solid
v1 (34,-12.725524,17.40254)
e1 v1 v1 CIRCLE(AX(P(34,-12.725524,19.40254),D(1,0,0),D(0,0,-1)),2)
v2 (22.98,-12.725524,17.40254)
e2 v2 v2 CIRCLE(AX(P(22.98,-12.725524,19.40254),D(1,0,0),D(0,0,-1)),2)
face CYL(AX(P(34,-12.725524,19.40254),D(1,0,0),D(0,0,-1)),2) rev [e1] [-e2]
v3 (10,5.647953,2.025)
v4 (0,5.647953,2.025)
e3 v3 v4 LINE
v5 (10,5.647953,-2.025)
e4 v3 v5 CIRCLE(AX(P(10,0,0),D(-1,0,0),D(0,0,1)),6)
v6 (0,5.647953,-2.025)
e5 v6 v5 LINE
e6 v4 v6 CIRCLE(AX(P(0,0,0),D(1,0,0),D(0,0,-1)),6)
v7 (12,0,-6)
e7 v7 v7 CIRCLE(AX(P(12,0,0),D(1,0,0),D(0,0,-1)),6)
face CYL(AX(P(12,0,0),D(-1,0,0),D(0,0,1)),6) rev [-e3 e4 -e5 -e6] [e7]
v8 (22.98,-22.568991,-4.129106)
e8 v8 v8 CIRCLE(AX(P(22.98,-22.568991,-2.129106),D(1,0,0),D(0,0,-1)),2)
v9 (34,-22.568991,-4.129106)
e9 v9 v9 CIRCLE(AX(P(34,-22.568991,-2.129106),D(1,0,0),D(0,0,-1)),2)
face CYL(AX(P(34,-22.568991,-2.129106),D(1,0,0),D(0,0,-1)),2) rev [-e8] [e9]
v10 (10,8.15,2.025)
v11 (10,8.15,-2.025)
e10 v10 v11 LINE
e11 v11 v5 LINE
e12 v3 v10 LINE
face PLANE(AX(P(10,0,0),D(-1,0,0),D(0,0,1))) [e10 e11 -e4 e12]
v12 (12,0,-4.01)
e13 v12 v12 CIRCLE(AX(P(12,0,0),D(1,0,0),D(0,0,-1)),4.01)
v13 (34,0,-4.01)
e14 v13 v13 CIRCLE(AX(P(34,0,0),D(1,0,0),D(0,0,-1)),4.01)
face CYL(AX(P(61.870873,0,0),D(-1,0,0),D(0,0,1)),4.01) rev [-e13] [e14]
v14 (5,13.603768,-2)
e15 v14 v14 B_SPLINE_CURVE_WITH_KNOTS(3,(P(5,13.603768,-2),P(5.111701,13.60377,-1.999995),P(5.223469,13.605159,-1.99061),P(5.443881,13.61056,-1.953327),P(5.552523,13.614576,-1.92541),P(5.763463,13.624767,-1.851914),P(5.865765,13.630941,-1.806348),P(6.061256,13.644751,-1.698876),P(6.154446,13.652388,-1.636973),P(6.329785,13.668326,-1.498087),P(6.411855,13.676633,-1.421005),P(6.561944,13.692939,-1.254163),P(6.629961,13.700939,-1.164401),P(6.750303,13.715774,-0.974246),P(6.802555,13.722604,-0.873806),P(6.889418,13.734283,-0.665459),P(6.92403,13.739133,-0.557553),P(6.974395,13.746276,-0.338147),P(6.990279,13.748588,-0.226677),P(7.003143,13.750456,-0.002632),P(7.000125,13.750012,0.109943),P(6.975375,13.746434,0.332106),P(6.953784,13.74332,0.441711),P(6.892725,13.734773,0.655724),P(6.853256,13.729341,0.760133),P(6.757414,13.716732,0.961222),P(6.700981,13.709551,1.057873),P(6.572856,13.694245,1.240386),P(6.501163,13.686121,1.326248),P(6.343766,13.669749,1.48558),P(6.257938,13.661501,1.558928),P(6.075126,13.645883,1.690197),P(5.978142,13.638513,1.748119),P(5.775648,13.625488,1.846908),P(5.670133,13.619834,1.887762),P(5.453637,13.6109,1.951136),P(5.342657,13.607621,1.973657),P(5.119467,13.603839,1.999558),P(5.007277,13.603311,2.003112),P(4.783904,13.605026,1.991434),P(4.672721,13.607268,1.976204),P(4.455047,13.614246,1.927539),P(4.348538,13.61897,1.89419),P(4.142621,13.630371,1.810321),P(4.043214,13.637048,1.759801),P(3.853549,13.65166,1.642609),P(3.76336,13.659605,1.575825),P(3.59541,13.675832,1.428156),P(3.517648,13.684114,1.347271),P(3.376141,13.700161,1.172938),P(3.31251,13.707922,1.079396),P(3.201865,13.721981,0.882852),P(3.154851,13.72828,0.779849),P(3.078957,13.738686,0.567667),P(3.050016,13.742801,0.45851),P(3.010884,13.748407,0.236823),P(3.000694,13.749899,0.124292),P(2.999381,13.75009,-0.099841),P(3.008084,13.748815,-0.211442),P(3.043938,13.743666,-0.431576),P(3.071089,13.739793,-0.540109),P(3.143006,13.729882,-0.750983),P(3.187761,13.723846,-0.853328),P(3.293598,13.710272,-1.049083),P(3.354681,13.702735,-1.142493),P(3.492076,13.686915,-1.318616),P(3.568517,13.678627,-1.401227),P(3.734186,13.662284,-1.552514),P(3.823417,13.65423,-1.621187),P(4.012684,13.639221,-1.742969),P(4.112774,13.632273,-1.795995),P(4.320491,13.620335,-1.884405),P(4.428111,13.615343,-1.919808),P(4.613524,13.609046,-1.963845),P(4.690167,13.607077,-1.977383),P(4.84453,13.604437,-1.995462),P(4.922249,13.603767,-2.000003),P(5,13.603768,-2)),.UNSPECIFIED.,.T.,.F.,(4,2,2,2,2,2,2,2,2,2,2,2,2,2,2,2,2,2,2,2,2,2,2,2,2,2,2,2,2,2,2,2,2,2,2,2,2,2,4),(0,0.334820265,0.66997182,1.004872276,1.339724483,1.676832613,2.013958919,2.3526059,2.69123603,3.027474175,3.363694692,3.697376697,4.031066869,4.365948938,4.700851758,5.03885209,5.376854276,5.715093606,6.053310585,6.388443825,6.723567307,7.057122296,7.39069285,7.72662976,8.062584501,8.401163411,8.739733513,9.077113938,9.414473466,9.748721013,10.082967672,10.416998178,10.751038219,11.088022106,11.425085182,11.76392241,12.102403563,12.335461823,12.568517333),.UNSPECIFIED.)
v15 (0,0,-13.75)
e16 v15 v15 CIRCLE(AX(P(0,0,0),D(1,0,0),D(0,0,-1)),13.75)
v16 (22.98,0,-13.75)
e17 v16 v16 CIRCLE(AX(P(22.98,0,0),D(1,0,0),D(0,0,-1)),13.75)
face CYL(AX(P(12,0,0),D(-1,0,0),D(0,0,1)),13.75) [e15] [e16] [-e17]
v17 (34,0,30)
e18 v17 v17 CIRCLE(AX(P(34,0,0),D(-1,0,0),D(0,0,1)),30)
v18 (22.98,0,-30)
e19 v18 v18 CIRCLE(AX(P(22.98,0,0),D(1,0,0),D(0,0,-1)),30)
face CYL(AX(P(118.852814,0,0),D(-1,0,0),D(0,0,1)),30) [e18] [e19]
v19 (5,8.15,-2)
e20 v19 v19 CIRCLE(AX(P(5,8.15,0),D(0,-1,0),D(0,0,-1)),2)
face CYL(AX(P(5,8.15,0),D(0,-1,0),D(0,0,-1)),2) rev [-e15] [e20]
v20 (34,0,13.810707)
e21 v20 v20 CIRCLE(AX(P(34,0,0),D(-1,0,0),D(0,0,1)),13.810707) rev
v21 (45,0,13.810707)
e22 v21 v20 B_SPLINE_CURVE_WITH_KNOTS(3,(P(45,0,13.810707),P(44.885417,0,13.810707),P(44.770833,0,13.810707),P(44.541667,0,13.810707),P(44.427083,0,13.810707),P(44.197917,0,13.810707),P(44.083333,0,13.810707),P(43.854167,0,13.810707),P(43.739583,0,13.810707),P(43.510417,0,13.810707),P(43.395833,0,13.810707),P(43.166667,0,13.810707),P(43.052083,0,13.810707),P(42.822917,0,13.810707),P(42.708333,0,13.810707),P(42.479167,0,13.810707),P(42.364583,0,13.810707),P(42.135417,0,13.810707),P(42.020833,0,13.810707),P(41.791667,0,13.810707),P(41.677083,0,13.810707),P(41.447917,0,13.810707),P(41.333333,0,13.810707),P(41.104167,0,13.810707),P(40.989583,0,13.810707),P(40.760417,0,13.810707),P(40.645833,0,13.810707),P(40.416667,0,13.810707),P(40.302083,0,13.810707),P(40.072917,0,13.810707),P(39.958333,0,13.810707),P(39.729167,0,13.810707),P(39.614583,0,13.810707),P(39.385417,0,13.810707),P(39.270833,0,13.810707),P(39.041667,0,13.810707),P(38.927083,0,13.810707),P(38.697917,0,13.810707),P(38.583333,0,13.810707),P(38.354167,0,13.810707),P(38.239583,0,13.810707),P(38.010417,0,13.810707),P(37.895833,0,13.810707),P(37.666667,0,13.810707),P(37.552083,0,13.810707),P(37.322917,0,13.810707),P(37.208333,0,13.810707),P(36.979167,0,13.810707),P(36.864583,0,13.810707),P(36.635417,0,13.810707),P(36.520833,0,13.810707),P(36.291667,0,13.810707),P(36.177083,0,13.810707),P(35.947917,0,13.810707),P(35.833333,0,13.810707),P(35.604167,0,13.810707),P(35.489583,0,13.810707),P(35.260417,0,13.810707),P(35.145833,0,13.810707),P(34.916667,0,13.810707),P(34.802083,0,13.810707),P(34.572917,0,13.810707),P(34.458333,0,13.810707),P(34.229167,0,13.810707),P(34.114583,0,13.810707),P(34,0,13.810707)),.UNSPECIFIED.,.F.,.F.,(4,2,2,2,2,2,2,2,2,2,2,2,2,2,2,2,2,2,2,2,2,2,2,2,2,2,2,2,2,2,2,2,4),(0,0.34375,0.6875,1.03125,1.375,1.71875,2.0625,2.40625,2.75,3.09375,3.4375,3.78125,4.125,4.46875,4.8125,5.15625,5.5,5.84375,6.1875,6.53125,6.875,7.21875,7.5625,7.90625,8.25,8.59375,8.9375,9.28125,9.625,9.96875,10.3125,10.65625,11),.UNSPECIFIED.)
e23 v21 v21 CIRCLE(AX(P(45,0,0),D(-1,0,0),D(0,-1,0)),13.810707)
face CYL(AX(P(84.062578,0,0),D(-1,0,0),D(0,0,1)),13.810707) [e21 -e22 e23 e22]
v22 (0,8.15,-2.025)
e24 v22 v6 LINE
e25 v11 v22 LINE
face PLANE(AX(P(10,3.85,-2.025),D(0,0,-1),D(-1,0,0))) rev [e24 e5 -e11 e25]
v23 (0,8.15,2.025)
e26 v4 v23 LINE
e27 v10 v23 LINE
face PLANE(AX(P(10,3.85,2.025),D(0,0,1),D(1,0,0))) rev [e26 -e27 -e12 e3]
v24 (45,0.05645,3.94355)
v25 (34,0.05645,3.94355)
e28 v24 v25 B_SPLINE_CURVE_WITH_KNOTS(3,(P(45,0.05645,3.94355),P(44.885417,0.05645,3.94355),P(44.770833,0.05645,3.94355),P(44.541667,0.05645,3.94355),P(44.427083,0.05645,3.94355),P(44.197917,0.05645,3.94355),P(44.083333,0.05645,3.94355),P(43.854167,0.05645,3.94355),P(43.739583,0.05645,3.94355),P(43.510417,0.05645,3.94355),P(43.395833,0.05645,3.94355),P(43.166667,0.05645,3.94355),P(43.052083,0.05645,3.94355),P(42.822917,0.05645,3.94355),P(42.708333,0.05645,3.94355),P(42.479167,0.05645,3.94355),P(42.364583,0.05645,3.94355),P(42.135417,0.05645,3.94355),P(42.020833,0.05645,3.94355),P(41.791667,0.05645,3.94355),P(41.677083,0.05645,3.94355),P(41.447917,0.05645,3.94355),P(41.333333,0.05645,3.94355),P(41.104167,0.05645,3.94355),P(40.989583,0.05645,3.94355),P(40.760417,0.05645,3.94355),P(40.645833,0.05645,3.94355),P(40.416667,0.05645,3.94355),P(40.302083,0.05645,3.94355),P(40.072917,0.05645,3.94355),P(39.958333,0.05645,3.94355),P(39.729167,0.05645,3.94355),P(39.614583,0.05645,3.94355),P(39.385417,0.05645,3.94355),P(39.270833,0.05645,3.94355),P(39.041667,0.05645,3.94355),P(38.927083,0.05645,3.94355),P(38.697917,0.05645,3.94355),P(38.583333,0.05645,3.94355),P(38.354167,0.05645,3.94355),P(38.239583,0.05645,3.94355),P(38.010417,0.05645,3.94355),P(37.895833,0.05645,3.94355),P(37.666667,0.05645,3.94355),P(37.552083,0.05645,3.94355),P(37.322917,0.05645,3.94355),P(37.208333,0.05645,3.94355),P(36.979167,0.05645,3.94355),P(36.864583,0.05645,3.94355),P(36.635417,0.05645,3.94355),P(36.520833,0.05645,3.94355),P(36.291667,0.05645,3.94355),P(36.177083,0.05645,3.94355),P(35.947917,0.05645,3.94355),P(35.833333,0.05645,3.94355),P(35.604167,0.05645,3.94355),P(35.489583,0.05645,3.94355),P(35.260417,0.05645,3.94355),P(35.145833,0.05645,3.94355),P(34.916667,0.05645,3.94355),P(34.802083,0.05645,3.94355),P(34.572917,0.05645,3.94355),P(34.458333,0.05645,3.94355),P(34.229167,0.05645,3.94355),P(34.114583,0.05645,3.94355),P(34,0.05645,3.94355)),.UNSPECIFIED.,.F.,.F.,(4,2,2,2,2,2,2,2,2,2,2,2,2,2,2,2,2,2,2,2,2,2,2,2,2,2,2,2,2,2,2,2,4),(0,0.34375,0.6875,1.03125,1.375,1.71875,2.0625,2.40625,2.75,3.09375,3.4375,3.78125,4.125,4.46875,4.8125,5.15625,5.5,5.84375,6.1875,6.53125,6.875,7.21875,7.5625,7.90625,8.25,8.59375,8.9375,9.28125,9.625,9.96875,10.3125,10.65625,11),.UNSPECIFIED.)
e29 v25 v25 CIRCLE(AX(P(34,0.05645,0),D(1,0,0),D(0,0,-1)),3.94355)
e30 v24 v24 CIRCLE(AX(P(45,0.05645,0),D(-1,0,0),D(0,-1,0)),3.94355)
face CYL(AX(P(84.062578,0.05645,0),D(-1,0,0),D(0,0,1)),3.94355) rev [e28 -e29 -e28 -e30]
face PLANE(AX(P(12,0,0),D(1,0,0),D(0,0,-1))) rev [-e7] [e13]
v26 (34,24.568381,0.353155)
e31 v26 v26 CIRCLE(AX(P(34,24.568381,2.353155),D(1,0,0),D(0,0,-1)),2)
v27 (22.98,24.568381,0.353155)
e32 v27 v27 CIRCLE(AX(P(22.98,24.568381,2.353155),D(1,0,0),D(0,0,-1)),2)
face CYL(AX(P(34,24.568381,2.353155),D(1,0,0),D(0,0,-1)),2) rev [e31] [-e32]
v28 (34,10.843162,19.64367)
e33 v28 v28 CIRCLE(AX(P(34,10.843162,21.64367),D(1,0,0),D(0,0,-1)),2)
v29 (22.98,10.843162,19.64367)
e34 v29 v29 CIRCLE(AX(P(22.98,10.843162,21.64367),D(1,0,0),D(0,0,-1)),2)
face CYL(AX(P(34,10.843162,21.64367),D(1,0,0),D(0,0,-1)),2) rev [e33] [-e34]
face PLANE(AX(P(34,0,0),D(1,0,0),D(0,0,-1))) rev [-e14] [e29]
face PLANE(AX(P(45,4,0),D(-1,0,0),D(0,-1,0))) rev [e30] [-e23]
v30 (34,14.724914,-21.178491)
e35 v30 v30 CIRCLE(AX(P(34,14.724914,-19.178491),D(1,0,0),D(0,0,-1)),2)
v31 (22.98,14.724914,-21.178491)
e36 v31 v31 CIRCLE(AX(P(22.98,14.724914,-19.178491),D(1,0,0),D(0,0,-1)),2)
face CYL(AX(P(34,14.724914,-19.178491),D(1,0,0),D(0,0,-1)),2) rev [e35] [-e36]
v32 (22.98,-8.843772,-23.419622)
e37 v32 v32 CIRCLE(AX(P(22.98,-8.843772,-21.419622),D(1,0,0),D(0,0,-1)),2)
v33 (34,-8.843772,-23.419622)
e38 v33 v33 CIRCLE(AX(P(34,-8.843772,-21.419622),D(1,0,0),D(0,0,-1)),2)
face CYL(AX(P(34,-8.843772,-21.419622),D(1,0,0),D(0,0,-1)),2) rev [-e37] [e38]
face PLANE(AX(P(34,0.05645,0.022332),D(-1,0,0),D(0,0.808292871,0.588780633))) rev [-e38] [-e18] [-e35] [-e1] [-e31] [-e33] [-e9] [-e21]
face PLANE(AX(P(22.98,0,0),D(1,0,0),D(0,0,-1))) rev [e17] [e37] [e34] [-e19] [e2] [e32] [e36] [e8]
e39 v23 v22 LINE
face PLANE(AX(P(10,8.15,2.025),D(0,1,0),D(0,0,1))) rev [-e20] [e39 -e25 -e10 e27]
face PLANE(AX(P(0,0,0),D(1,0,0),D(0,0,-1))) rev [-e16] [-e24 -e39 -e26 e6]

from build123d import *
from build123d.topology import SkipClean

# Parameters (mm, degrees)
SKETCH1_R                 = 13.75
SKETCH1_R_2               = 6
BOSS_EXTRUDE1_DEPTH       = 12
SKETCH2_R                 = 13.75
SKETCH2_R_2               = 4.01
BOSS_EXTRUDE3_DEPTH       = 10.98
SKETCH3_R                 = 30
BOSS_EXTRUDE4_DEPTH       = 11.02
F_4_0MM_DOWEL_HOLE1_D     = 4
F_4_0MM_DOWEL_HOLE1_DEPTH = 25.4
F_4_0MM_DOWEL_HOLE1_TIP   = 1.201721238
SKETCH11_W                = 4.05
SKETCH11_H                = 4.3
CUT_EXTRUDE1_DEPTH        = 10
CUT_EXTRUDE2_START        = -32
SKETCH15_R                = 4.01
CUT_EXTRUDE2_DEPTH        = 32
SKETCH16_R                = 13.810706785
SKETCH16_R_2              = 3.943549935
BOSS_EXTRUDE5_DEPTH       = 11


with BuildPart() as part:
    # Sketch1 → Boss-Extrude1 (new body)
    with BuildSketch(Plane(origin=(0, 0, 0), x_dir=(0, 0, -1), z_dir=(1, 0, 0))):
        Circle(SKETCH1_R)
        Circle(SKETCH1_R_2, mode=Mode.SUBTRACT)
    extrude(amount=BOSS_EXTRUDE1_DEPTH)

    # Sketch2 → Boss-Extrude3 (add)
    with BuildSketch(Plane(origin=(12, 0, 0), x_dir=(0, 0, -1), z_dir=(1, 0, 0))):
        with Locations(Location((0, 0, 0), (0, 0, 180))):
            Circle(SKETCH2_R)
        with Locations(Location((0, 0, 0), (0, 0, 180))):
            Circle(SKETCH2_R_2, mode=Mode.SUBTRACT)
    extrude(amount=BOSS_EXTRUDE3_DEPTH)

    # Sketch3 → Boss-Extrude4 (add)
    with BuildSketch(Plane(origin=(22.98, 0, 0), x_dir=(0, 0, -1), z_dir=(1, 0, 0))):
        with Locations(Location((0, 0, 0), (0, 0, 180))):
            Circle(SKETCH3_R)
    extrude(amount=BOSS_EXTRUDE4_DEPTH)

    # Ø4.0mm Dowel Hole1
    with Locations(Plane(origin=(34, 0, 0), x_dir=(0, 0, -1), z_dir=(1, 0, 0))):
        with Locations((-21.643670313, 10.843162234), (-2.353154811, 24.568381237), (19.178491269, 14.724914261), (21.419621846, -8.843771717), (-19.402539736, -12.725523744), (2.129106344, -22.56899072)):
            Hole(F_4_0MM_DOWEL_HOLE1_D / 2, depth=F_4_0MM_DOWEL_HOLE1_DEPTH)
            with Locations((0, 0, -(F_4_0MM_DOWEL_HOLE1_DEPTH + F_4_0MM_DOWEL_HOLE1_TIP / 2))):  # 118° drill point
                Cone(0, F_4_0MM_DOWEL_HOLE1_D / 2, F_4_0MM_DOWEL_HOLE1_TIP, mode=Mode.SUBTRACT)

    # Sketch11 → Cut-Extrude1 (cut)
    with BuildSketch(Plane.ZY):
        with Locations((0, 6)):
            Rectangle(SKETCH11_W, SKETCH11_H)
    extrude(amount=-CUT_EXTRUDE1_DEPTH, mode=Mode.SUBTRACT)

    # Sketch14 → Ø4.0mm Dowel Hole2 (revolve, cut)
    with BuildSketch(Plane(origin=(5, 8.15, 0), x_dir=(0, 0, -1), z_dir=(1, 0, 0))):
        Polygon((0, 0), (0, 26.601721238), (2, 25.4), (2, 0), align=None)
    revolve(axis=Axis((5, 1.8, 0), (0, 1, 0)), mode=Mode.SUBTRACT)

    # Sketch15 → Cut-Extrude2 (cut)
    with SkipClean():  # the faces are left unmerged after this step: merging them gives an invalid solid
        with BuildSketch(Plane(origin=(34, 0, 0), x_dir=(0, 0, -1), z_dir=(1, 0, 0)).offset(CUT_EXTRUDE2_START)):
            Circle(SKETCH15_R)
        extrude(amount=CUT_EXTRUDE2_DEPTH, mode=Mode.SUBTRACT)
    add(part.part.scale(1), mode=Mode.REPLACE)  # the faces are merged on a copy

    # Sketch16 → Boss-Extrude5 (add)
    with BuildSketch(Plane(origin=(34, 0, 0), x_dir=(0, 0, -1), z_dir=(1, 0, 0))):
        with Locations(Location((0, 0, 0), (0, 0, 180))):
            Circle(SKETCH16_R)
        with Locations(Location((0, 0.056450065, 0), (0, 0, 180))):
            Circle(SKETCH16_R_2, mode=Mode.SUBTRACT)
    extrude(amount=BOSS_EXTRUDE5_DEPTH)


solid = part.part
